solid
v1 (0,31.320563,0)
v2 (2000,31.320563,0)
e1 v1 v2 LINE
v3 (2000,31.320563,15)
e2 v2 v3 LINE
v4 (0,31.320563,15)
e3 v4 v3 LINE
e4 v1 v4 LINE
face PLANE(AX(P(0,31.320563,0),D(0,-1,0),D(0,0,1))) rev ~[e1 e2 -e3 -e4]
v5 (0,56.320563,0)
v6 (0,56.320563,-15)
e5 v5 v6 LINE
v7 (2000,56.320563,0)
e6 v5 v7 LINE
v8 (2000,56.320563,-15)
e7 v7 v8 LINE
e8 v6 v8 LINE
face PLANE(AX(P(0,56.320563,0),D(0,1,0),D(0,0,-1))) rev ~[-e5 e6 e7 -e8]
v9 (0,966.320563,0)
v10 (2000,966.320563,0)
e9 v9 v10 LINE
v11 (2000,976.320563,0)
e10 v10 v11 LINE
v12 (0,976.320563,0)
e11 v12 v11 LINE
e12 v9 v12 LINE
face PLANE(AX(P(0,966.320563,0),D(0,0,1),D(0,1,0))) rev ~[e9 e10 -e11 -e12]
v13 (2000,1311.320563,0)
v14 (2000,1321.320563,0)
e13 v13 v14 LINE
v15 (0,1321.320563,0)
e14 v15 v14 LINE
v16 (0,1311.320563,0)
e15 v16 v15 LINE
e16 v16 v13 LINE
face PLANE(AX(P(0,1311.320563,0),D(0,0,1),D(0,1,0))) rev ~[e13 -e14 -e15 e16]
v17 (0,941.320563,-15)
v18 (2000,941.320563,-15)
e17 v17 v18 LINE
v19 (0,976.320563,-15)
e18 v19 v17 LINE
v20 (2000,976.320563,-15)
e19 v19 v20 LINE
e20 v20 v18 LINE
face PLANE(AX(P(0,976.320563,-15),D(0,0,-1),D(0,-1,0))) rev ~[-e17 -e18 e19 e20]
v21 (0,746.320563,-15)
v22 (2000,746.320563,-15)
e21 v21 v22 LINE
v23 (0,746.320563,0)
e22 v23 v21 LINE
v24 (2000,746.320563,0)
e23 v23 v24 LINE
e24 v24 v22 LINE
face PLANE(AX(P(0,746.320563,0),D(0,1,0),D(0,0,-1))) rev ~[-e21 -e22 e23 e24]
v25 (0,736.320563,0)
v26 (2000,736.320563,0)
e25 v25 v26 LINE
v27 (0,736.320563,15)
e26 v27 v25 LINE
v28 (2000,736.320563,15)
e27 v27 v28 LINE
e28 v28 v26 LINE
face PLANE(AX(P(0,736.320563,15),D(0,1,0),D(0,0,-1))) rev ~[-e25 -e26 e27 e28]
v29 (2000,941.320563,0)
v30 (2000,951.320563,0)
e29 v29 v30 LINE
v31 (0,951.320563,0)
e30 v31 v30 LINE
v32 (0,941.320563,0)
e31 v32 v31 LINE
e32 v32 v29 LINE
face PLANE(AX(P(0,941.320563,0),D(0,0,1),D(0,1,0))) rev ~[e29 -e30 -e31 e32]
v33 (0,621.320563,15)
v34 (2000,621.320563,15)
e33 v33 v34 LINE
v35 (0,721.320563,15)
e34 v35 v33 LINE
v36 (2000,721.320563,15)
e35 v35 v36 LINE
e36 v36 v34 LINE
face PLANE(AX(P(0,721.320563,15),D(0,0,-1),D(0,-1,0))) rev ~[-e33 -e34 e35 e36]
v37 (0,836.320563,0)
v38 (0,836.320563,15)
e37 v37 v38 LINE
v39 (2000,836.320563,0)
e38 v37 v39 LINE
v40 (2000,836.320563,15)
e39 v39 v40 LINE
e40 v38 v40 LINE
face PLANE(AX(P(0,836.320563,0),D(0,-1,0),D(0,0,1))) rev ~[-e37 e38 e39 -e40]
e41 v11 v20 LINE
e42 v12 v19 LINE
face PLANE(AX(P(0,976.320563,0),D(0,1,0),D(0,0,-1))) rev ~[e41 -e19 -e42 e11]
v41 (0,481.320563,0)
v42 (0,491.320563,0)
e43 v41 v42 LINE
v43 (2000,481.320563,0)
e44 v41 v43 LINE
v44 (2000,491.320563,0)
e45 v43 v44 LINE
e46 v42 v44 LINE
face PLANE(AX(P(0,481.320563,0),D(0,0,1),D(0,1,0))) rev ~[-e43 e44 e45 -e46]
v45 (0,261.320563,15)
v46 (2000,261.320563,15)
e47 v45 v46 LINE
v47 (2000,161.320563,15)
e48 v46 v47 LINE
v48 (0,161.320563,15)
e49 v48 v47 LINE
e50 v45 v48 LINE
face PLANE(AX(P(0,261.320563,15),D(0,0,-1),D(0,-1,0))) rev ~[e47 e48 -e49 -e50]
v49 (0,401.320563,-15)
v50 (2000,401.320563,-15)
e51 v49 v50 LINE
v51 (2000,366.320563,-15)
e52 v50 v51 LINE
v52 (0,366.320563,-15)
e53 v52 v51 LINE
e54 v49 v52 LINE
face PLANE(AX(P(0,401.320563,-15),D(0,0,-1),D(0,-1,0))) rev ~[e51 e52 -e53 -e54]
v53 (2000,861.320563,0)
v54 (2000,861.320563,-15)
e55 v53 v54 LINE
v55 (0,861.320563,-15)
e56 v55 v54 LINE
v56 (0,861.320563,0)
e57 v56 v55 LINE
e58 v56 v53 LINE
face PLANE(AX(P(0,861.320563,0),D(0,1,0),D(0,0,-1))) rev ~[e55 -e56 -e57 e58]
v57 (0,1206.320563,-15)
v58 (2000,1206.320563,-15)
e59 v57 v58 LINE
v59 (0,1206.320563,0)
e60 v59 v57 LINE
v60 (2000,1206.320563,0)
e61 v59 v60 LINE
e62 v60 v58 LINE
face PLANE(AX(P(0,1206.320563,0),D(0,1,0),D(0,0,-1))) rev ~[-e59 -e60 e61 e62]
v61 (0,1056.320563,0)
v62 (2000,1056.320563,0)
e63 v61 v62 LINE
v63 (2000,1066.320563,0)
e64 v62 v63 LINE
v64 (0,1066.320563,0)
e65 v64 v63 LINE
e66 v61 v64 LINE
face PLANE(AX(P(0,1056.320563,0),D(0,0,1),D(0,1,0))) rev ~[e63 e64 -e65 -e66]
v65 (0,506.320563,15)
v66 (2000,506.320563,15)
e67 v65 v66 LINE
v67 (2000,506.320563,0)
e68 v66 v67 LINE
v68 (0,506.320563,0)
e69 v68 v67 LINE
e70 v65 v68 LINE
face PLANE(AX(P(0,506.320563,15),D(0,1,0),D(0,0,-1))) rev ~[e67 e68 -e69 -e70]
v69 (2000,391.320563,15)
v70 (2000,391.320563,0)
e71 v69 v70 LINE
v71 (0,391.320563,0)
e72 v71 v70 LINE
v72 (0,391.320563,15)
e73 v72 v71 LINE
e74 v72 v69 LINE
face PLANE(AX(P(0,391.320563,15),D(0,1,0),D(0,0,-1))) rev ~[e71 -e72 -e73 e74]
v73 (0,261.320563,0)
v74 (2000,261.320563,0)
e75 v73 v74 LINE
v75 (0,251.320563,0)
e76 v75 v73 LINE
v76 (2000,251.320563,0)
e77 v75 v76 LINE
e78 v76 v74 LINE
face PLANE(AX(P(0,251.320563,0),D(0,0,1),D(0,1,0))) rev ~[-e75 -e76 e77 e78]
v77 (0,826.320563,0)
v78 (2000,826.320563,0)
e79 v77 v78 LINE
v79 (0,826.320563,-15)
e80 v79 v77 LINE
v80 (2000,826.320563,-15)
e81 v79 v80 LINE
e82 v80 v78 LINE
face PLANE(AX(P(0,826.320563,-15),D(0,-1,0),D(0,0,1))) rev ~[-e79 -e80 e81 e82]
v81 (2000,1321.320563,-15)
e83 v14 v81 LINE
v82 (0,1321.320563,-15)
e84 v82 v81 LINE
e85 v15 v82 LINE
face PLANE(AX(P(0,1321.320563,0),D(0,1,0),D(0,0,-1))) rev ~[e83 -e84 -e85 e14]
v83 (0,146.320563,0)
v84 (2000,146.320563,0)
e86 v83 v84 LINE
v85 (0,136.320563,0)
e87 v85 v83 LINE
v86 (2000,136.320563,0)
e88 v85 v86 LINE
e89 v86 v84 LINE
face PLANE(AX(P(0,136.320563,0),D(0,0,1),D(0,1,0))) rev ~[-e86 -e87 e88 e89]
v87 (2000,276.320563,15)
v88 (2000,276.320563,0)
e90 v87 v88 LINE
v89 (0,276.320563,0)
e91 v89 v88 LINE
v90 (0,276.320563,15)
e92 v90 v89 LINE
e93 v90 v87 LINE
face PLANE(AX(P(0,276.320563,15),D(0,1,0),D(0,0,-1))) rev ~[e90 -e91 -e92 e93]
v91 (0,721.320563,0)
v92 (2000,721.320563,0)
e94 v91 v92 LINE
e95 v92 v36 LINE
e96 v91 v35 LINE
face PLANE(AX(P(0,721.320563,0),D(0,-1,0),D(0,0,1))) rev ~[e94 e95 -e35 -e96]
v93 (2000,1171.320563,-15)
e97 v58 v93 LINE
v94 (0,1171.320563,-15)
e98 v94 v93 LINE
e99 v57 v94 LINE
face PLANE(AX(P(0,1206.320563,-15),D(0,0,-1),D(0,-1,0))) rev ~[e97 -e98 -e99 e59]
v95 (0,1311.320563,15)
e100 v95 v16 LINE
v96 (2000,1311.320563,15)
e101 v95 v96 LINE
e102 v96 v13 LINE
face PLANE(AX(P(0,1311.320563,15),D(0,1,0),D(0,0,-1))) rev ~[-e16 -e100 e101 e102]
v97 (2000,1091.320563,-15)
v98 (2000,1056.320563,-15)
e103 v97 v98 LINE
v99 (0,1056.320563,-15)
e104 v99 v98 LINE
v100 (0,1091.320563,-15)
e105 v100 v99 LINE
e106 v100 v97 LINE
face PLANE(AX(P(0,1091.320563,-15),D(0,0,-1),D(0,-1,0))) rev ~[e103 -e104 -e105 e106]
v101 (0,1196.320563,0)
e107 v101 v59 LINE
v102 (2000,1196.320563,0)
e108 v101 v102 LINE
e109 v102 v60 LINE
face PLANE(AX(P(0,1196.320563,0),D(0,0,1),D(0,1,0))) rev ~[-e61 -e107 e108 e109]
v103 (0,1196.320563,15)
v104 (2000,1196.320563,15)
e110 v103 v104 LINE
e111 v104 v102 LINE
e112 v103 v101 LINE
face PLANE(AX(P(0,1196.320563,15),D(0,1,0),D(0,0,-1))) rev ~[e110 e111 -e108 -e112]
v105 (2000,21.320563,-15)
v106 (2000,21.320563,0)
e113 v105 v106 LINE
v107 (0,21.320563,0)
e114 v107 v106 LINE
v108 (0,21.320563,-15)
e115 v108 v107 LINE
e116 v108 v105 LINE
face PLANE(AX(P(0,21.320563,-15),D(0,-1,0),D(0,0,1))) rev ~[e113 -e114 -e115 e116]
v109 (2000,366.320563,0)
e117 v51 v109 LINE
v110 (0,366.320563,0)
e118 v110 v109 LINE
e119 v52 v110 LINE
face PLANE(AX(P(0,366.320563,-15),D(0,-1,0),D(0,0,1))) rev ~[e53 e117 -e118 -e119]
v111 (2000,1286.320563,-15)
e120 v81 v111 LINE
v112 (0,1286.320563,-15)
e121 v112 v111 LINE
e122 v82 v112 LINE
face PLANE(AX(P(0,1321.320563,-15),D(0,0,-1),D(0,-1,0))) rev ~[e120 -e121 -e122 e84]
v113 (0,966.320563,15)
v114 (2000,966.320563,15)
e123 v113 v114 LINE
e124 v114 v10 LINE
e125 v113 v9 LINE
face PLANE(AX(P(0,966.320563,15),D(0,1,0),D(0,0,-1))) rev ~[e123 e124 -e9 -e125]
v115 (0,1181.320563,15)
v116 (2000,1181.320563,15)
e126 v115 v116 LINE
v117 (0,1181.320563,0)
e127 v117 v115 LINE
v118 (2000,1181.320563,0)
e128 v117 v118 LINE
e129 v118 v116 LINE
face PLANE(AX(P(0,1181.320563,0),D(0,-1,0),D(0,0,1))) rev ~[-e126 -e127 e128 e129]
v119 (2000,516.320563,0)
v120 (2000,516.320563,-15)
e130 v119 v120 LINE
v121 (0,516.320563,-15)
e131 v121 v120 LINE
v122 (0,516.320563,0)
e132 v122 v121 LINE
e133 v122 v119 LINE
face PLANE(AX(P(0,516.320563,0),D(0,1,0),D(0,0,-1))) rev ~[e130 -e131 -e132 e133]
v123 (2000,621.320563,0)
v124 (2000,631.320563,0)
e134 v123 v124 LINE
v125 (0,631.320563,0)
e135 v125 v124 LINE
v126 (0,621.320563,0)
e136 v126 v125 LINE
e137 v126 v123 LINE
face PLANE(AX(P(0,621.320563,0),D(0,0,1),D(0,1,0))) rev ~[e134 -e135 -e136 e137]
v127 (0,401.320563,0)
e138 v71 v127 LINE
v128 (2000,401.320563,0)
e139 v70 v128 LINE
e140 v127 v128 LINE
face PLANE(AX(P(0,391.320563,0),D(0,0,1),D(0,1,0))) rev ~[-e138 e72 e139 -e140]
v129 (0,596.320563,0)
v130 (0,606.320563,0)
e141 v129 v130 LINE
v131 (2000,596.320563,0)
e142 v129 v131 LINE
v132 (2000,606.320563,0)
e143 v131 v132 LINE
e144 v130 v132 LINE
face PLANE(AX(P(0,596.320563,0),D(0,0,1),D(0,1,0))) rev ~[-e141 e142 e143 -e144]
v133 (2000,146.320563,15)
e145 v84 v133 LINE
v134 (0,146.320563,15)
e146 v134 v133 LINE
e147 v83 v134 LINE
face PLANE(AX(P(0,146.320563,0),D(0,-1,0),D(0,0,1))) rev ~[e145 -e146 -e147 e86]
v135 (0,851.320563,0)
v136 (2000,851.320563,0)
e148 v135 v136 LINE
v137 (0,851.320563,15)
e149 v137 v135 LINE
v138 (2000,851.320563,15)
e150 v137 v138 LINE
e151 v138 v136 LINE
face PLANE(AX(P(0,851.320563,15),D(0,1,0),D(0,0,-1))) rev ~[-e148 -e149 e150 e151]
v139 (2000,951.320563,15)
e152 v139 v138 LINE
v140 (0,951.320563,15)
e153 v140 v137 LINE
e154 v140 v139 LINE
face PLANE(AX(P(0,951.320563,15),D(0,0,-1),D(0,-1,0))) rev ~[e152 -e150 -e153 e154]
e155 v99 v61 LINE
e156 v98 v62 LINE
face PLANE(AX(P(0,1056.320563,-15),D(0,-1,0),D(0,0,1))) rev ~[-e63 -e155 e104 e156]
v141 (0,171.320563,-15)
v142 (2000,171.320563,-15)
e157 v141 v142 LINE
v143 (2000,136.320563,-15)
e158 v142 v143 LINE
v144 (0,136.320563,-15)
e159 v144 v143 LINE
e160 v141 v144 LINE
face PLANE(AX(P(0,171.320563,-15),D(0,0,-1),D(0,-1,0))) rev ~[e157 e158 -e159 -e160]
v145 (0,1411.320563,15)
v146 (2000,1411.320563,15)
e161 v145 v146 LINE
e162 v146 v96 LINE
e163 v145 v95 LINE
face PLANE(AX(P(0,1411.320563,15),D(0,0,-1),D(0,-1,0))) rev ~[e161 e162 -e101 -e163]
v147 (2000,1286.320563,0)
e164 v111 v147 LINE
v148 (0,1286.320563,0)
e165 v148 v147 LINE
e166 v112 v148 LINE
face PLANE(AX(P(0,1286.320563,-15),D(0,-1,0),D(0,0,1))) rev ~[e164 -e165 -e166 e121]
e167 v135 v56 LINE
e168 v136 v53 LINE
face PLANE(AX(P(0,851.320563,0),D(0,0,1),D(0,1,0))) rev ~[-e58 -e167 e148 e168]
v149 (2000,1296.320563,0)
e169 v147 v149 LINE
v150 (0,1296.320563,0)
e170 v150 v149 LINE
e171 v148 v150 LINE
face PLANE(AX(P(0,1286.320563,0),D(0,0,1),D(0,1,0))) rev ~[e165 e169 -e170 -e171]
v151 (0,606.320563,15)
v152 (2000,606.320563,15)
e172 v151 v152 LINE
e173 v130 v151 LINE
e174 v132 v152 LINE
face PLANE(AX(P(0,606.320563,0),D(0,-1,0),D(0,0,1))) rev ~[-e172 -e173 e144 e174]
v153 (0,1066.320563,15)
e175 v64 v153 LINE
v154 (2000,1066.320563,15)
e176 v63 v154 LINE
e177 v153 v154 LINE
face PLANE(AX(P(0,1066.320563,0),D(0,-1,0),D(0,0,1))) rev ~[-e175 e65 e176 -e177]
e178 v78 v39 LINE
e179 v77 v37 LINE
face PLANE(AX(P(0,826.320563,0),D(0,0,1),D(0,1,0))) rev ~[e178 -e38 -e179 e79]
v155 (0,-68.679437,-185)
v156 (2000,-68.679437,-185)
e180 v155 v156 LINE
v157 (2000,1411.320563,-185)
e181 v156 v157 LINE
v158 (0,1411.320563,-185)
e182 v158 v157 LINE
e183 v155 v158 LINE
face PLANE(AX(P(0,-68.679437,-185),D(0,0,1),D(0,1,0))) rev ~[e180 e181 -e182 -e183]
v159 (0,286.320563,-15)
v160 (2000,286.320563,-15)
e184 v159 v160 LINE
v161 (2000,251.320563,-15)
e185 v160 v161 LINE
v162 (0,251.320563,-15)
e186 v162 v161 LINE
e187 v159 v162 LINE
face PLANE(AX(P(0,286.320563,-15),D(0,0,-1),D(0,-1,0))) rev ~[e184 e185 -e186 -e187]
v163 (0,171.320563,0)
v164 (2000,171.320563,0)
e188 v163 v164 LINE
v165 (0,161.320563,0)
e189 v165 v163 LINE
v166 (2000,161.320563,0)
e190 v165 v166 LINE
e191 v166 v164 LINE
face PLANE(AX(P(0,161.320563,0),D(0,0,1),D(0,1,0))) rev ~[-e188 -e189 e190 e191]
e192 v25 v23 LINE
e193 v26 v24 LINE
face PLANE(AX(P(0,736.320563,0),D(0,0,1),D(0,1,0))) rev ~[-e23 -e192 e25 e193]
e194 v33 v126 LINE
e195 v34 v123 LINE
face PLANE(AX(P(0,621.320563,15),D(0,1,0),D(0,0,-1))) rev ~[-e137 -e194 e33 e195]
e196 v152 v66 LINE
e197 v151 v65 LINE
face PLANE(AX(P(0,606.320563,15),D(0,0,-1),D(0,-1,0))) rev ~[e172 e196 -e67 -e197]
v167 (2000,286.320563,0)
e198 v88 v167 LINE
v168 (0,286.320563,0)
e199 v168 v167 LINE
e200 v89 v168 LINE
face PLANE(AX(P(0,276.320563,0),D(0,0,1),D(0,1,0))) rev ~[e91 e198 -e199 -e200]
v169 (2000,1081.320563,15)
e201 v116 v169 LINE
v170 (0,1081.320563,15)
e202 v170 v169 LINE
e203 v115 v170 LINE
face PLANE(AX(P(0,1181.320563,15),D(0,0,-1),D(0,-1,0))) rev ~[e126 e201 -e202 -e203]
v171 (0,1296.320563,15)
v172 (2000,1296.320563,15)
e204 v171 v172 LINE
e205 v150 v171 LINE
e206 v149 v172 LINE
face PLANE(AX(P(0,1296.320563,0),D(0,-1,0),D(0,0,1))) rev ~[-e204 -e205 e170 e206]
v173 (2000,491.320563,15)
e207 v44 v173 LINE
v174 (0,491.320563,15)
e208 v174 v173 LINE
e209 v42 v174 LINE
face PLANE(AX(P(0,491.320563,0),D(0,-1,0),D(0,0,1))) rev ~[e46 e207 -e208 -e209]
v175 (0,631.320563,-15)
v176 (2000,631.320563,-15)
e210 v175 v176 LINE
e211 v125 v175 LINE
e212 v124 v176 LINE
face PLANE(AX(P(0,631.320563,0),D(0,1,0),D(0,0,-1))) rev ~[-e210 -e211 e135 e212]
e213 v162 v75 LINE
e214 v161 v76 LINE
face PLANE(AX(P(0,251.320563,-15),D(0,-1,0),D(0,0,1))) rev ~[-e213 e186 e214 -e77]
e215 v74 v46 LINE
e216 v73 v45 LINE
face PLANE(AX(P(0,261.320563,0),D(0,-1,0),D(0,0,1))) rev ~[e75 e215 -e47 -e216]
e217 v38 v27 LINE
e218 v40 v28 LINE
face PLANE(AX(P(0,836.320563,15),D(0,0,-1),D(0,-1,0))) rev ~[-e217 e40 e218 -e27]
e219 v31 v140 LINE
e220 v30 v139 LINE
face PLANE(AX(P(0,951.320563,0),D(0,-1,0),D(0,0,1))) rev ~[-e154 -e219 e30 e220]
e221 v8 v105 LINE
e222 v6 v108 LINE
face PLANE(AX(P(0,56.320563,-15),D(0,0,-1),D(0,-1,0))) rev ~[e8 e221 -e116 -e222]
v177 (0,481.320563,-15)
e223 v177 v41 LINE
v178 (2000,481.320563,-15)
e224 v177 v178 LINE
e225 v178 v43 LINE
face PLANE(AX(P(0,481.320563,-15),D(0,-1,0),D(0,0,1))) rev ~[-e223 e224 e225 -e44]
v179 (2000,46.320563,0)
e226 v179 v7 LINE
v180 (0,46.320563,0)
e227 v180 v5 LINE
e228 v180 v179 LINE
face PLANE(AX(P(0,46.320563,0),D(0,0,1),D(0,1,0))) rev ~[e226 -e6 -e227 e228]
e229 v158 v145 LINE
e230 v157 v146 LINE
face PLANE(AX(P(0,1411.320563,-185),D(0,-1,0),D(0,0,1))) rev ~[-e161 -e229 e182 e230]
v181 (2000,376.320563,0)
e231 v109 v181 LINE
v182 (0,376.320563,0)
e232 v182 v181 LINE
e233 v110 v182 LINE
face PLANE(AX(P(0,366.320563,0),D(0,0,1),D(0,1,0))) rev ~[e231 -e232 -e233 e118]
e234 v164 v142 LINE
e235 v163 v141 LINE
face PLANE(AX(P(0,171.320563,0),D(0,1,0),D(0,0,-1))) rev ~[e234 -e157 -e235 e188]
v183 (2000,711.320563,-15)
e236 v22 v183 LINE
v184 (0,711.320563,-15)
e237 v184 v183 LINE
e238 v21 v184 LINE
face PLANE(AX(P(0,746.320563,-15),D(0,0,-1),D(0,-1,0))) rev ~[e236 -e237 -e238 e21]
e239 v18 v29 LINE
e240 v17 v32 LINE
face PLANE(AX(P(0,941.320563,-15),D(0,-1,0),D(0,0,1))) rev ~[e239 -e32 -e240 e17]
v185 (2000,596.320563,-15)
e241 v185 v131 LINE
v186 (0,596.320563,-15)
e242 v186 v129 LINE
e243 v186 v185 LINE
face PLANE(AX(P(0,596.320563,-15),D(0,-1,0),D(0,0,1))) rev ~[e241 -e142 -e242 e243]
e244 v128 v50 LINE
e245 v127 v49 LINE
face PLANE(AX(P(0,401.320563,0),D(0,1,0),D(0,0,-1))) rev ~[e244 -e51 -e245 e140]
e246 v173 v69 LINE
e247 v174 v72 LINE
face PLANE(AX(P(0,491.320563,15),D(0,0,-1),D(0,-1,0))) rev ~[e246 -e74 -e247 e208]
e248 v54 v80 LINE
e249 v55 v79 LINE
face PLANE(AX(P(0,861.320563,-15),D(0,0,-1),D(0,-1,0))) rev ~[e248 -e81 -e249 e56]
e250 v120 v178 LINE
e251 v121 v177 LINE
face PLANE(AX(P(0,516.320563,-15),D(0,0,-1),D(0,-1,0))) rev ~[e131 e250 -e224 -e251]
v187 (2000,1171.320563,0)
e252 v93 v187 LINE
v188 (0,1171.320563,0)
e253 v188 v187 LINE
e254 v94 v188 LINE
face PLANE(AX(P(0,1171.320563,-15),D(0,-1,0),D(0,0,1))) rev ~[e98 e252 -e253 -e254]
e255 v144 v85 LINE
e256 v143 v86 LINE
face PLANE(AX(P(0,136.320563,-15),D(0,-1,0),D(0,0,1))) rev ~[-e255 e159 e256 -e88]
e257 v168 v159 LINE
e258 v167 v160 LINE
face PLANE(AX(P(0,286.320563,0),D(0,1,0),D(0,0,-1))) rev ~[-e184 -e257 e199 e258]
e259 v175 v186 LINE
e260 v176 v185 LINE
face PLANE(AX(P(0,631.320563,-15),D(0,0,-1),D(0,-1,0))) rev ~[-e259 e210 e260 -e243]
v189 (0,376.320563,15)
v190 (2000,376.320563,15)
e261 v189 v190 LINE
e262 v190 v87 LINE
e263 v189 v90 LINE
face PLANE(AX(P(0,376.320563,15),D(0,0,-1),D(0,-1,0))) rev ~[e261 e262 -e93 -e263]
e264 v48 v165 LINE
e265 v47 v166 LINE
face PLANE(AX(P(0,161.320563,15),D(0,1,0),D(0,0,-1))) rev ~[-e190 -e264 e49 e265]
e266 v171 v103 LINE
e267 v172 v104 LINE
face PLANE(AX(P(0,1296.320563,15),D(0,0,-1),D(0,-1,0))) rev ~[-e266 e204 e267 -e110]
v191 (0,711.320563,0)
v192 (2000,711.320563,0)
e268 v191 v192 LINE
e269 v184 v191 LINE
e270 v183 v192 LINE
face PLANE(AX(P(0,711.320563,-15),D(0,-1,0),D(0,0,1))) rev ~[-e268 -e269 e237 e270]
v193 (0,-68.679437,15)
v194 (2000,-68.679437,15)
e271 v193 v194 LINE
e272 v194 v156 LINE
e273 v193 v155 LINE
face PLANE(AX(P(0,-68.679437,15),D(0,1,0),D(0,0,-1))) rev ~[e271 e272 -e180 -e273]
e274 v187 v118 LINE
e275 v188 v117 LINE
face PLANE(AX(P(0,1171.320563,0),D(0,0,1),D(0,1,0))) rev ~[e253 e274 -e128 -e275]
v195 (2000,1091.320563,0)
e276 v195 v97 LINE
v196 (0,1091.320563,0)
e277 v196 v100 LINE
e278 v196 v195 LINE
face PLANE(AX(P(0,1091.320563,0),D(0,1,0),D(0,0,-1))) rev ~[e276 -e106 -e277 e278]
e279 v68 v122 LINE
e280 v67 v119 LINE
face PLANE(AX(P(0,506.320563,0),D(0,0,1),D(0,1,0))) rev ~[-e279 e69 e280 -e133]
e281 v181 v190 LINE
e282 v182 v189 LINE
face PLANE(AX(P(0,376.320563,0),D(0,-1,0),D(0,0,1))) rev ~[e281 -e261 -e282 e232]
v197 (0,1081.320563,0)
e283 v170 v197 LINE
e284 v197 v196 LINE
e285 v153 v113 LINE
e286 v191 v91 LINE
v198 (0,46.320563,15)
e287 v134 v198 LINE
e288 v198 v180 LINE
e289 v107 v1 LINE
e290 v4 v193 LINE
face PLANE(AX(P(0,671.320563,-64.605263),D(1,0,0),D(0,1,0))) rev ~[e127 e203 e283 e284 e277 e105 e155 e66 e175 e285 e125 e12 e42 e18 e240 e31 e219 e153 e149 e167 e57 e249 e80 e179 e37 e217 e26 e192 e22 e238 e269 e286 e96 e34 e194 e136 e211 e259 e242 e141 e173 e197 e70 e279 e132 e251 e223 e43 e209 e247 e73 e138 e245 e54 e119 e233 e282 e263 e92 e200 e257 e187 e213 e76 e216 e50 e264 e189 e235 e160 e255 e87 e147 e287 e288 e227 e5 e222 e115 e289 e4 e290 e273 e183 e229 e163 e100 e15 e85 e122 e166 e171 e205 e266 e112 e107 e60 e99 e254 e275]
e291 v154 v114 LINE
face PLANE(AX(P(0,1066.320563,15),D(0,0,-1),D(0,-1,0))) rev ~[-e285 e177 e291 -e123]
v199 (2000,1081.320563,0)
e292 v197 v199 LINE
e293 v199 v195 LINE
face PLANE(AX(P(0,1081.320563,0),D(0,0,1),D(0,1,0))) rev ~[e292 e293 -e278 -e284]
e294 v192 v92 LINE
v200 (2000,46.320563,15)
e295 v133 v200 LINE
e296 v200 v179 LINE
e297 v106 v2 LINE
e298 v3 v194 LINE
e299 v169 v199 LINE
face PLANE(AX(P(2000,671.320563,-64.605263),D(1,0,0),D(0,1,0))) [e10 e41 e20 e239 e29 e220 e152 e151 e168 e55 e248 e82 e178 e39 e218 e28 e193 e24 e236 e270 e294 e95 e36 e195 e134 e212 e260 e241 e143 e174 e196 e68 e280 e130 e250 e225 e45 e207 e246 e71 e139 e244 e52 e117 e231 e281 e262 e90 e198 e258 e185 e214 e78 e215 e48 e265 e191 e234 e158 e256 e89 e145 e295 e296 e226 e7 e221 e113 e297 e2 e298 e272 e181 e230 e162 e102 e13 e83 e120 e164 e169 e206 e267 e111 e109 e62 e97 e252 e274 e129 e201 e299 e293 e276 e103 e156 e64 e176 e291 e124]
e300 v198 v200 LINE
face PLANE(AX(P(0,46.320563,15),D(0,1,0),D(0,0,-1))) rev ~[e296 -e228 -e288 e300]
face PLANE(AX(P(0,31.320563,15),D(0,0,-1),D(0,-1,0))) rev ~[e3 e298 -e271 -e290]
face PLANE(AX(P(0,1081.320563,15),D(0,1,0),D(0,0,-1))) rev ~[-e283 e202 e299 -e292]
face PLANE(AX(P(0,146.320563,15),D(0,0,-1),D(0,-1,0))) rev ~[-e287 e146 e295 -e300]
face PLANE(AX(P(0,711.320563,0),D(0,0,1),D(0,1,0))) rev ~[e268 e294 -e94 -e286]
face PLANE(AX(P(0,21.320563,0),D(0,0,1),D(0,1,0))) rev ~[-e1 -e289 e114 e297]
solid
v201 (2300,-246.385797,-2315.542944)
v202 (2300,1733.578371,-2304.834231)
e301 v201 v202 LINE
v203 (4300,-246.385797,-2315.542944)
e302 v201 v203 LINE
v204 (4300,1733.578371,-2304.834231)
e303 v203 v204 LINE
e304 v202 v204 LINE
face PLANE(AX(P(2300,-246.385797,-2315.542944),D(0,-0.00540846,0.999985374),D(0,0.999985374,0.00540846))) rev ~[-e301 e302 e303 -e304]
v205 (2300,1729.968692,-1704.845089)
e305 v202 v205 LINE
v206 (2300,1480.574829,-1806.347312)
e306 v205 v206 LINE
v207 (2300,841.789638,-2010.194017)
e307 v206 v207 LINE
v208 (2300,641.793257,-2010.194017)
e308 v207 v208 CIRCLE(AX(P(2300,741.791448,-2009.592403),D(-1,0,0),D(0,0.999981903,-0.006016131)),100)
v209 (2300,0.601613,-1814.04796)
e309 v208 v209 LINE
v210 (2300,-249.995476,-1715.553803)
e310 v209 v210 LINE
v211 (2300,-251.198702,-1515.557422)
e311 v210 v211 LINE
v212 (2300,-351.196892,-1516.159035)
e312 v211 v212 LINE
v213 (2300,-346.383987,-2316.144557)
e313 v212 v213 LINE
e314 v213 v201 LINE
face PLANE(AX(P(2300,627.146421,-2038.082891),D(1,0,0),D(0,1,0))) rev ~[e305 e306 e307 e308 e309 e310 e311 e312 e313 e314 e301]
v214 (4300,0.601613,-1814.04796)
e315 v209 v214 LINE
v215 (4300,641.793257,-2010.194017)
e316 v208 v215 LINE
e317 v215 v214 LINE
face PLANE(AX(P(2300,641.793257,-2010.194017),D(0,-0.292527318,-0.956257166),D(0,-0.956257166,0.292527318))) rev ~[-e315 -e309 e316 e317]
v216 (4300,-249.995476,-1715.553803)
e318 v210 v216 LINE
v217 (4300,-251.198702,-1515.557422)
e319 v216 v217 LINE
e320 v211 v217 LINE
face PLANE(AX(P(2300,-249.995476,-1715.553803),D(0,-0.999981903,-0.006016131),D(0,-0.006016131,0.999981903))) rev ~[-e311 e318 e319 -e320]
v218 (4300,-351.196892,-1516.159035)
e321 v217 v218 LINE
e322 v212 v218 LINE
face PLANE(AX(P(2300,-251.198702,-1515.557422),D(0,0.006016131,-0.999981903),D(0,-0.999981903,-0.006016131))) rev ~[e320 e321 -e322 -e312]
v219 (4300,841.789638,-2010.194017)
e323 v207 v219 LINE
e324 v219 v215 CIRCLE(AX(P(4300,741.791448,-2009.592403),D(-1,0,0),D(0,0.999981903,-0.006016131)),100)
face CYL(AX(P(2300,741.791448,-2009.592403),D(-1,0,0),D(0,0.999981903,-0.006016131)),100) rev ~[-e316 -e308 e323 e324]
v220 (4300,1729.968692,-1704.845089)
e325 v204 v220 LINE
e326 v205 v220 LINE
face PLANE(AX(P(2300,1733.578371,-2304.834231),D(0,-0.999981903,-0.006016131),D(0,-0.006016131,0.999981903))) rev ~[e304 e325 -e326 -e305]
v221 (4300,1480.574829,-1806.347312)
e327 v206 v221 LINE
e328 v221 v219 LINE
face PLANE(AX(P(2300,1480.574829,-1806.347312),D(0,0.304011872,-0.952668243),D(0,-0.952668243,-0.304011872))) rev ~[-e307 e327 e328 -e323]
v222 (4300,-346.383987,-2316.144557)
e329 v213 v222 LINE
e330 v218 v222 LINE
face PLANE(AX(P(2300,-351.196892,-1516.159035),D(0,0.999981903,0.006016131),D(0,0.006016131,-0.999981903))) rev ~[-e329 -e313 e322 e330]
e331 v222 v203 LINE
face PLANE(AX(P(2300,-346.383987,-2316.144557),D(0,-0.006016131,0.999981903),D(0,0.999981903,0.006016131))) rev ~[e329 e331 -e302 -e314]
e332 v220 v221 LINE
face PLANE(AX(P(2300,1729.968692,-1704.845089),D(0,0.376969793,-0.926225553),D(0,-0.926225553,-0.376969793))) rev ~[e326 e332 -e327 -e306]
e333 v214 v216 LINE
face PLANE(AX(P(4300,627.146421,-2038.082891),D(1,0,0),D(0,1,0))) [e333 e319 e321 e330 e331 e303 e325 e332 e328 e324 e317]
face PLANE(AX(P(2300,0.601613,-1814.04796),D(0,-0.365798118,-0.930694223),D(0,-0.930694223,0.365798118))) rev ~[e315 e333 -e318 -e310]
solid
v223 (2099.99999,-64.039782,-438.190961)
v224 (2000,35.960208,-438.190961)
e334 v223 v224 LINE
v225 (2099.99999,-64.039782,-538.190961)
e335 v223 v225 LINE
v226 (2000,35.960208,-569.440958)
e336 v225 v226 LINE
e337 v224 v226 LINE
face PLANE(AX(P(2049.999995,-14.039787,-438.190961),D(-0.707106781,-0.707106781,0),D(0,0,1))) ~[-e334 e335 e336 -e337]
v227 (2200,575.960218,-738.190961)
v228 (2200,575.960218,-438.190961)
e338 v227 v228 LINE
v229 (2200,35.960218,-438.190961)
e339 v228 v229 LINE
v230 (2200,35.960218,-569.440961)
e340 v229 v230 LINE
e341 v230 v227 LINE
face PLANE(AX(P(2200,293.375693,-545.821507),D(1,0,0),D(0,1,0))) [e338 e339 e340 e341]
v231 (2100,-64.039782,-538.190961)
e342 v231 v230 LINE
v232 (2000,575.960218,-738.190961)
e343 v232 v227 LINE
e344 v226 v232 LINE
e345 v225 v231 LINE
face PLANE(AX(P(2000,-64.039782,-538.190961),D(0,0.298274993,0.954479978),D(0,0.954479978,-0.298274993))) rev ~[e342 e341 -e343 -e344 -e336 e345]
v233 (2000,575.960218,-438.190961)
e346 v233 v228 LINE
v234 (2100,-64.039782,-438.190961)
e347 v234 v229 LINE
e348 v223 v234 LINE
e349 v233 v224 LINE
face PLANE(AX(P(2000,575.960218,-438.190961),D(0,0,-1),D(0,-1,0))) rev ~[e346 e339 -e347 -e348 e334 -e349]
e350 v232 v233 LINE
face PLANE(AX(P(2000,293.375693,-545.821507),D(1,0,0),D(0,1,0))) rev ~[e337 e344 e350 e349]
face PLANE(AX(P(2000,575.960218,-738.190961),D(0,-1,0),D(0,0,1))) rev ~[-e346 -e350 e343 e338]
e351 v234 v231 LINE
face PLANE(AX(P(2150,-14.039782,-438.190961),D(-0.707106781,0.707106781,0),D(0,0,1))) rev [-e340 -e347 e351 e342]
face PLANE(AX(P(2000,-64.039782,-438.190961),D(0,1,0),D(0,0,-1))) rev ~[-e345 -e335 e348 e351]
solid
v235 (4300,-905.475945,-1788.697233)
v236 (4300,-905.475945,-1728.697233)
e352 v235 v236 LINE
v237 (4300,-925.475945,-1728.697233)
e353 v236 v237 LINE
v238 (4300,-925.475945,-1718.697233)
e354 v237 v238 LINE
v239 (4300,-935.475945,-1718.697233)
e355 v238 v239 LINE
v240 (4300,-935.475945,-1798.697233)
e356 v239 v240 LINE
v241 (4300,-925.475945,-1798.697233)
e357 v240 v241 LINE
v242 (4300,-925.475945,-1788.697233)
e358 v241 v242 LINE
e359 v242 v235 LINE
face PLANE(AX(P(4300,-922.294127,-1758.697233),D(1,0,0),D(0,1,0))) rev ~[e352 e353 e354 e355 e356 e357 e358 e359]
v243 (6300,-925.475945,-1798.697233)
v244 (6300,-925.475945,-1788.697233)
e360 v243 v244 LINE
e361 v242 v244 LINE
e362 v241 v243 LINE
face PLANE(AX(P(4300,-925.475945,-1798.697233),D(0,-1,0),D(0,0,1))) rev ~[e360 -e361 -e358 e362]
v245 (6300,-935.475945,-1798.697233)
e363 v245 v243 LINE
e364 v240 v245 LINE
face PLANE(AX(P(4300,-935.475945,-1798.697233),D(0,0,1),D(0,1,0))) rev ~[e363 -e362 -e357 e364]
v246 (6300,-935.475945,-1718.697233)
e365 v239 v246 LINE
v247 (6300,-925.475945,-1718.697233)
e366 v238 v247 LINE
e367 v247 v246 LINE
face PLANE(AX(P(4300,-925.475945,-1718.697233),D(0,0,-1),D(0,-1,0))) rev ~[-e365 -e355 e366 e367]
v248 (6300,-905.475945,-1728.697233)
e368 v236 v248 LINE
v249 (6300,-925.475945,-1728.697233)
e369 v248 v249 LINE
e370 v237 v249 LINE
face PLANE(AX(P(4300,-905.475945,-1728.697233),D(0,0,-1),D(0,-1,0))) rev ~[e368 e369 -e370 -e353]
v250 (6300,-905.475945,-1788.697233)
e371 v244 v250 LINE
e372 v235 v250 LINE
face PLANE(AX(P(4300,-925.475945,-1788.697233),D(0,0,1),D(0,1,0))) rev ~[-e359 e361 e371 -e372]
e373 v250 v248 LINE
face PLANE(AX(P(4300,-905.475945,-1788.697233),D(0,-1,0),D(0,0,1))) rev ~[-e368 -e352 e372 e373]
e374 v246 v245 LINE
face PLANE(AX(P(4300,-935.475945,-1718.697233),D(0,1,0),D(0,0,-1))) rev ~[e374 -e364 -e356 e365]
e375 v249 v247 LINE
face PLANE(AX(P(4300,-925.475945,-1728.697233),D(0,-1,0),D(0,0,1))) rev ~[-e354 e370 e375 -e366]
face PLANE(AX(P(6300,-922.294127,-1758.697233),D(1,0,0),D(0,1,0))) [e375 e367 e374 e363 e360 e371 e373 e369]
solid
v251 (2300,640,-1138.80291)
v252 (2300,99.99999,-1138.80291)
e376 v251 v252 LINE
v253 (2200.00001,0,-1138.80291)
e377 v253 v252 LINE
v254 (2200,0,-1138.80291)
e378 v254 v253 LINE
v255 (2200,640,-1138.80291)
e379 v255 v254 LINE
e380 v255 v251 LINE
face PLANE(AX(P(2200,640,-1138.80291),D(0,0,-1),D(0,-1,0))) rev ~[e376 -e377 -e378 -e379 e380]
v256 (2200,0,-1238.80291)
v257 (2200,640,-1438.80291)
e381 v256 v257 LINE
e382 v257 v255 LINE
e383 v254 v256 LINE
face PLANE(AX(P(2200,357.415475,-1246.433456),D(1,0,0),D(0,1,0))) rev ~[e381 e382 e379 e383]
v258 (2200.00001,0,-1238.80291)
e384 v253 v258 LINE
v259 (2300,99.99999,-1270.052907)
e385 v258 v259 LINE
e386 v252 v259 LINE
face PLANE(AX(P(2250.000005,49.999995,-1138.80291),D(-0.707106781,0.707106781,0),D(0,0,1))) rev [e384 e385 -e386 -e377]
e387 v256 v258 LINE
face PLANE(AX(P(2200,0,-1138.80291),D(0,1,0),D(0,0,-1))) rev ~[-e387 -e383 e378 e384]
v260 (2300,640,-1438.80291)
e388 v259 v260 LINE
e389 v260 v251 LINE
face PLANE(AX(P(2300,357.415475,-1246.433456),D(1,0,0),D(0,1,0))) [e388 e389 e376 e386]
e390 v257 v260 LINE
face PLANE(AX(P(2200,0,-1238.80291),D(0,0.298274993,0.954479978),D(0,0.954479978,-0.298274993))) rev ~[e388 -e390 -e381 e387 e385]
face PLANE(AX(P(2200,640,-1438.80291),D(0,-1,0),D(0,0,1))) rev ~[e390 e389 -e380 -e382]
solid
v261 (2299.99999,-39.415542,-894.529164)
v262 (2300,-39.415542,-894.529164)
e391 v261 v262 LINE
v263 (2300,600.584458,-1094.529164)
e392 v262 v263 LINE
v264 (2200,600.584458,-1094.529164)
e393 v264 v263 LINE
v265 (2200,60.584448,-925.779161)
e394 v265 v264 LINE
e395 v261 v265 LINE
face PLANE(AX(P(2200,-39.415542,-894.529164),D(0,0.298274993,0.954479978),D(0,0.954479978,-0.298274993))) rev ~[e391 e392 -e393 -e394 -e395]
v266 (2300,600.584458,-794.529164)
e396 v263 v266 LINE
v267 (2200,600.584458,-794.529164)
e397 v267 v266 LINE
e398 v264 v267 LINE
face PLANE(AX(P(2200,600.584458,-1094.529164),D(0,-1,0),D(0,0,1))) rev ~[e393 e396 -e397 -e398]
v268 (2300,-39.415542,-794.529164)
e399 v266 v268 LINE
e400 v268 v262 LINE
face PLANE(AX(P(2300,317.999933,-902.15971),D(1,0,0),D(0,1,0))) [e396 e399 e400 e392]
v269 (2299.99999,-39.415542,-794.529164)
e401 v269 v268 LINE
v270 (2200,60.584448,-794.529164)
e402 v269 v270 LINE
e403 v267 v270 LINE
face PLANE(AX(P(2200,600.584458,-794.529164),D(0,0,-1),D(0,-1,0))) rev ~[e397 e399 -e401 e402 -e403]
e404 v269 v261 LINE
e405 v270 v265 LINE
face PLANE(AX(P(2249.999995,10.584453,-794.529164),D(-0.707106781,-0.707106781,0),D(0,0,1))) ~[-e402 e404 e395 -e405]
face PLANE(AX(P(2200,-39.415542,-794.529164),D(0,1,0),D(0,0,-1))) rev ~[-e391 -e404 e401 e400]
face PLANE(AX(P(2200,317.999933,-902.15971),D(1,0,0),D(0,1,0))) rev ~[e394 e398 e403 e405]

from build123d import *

# Parameters (mm, degrees)
F1_DEPTH  = 2000
F3_DEPTH  = 200
F4_SIZE   = 100
F5_SIZE   = 99.99999
F8_DEPTH  = 100
F9_DEPTH  = 100
F10_SIZE  = 99.99999
F11_SIZE  = 99.99999
F13_DEPTH = 2000
F15_DEPTH = 2000


# Not quite as in the source:
# - a fillet or chamfer is up to 0.001 mm smaller than in the source, because OpenCascade refuses the exact size


with BuildPart() as f1:
    # F0 (on Right) → F1 (new body)
    with BuildSketch(Plane.YZ):
        Polygon((31.3205629587, 15), (-68.6794370413, 15), (-68.6794370413, -185), (1411.3205629587, -185), (1411.3205629587, 15), (1311.3205629587, 15), (1311.3205629587, 0), (1321.3205629587, 0), (1321.3205629587, -15), (1286.3205629587, -15), (1286.3205629587, 0), (1296.3205629587, 0), (1296.3205629587, 15), (1196.3205629587, 15), (1196.3205629587, 0), (1206.3205629587, 0), (1206.3205629587, -15), (1171.3205629587, -15), (1171.3205629587, 0), (1181.3205629587, 0), (1181.3205629587, 15), (1081.3205629587, 15), (1081.3205629587, 0), (1091.3205629587, 0), (1091.3205629587, -15), (1056.3205629587, -15), (1056.3205629587, 0), (1066.3205629587, 0), (1066.3205629587, 15), (966.3205629587, 15), (966.3205629587, 0), (976.3205629587, 0), (976.3205629587, -15), (941.3205629587, -15), (941.3205629587, 0), (951.3205629587, 0), (951.3205629587, 15), (851.3205629587, 15), (851.3205629587, 0), (861.3205629587, 0), (861.3205629587, -15), (826.3205629587, -15), (826.3205629587, 0), (836.3205629587, 0), (836.3205629587, 15), (736.3205629587, 15), (736.3205629587, 0), (746.3205629587, 0), (746.3205629587, -15), (711.3205629587, -15), (711.3205629587, 0), (721.3205629587, 0), (721.3205629587, 15), (621.3205629587, 15), (621.3205629587, 0), (631.3205629587, 0), (631.3205629587, -15), (596.3205629587, -15), (596.3205629587, 0), (606.3205629587, 0), (606.3205629587, 15), (506.3205629587, 15), (506.3205629587, 0), (516.3205629587, 0), (516.3205629587, -15), (481.3205629587, -15), (481.3205629587, 0), (491.3205629587, 0), (491.3205629587, 15), (391.3205629587, 15), (391.3205629587, 0), (401.3205629587, 0), (401.3205629587, -15), (366.3205629587, -15), (366.3205629587, 0), (376.3205629587, 0), (376.3205629587, 15), (276.3205629587, 15), (276.3205629587, 0), (286.3205629587, 0), (286.3205629587, -15), (251.3205629587, -15), (251.3205629587, 0), (261.3205629587, 0), (261.3205629587, 15), (161.3205629587, 15), (161.3205629587, 0), (171.3205629587, 0), (171.3205629587, -15), (136.3205629587, -15), (136.3205629587, 0), (146.3205629587, 0), (146.3205629587, 15), (46.3205629587, 15), (46.3205629587, 0), (56.3205629587, 0), (56.3205629587, -15), (21.3205629587, -15), (21.3205629587, 0), (31.3205629587, 0), align=None)
    extrude(amount=F1_DEPTH)


with BuildPart() as f3:
    # F2 (on face) → F3 (new body)
    with BuildSketch(Plane.YZ.offset(2000)):
        Polygon((575.9602183104, -438.1909608841), (-64.0397816896, -438.1909608841), (-64.0397816896, -538.1909608841), (575.9602183104, -738.1909608841), align=None)
    extrude(amount=F3_DEPTH)

    # F4
    f4_edges = [f3.edges().sort_by_distance(p)[0] for p in [
        (2200, -64.039782, -488.190961),
    ]]
    chamfer(f4_edges, length=F4_SIZE)

    # F5 (size 100 in the source; OpenCascade refuses exactly that, so slightly less here)
    f5_edges = [f3.edges().sort_by_distance(p)[0] for p in [
        (2000, -64.039782, -488.190961),
    ]]
    chamfer(f5_edges, length=F5_SIZE)


with BuildPart() as f8:
    # F6 (on face) → F8 (new body)
    with BuildSketch(Plane.YZ.offset(2200)):
        Polygon((600.5844579637, -1094.5291638374), (600.5844579637, -794.5291638374), (-39.4155420363, -794.5291638374), (-39.4155420363, -894.5291638374), align=None)
    extrude(amount=F8_DEPTH)

    # F10 (size 100 in the source; OpenCascade refuses exactly that, so slightly less here)
    f10_edges = [f8.edges().sort_by_distance(p)[0] for p in [
        (2200, -39.415542, -844.529164),
    ]]
    chamfer(f10_edges, length=F10_SIZE)


with BuildPart() as f9:
    # F7 (on face) → F9 (new body)
    with BuildSketch(Plane.YZ.offset(2200)):
        Polygon((640, -1438.8029098511), (640, -1138.8029098511), (0, -1138.8029098511), (0, -1238.8029098511), align=None)
    extrude(amount=F9_DEPTH)

    # F11 (size 100 in the source; OpenCascade refuses exactly that, so slightly less here)
    f11_edges = [f9.edges().sort_by_distance(p)[0] for p in [
        (2300, 0, -1188.80291),
    ]]
    chamfer(f11_edges, length=F11_SIZE)


with BuildPart() as f13:
    # F12 (on face) → F13 (new body)
    with BuildSketch(Plane.YZ.offset(2300)):
        with BuildLine():
            ThreePointArc((841.7896378459, -2010.1940166026), (741.7914475541, -2109.592403471), (641.7932572623, -2010.1940166026))
            Line((641.7932572623, -2010.1940166026), (0.6016131315, -1814.0479600607))
            Line((0.6016131315, -1814.0479600607), (-249.9954757296, -1715.5538025978))
            Line((-249.9954757296, -1715.5538025978), (-251.1987019926, -1515.5574220141))
            Line((-251.1987019926, -1515.5574220141), (-351.1968922845, -1516.1590351456))
            Line((-351.1968922845, -1516.1590351456), (-346.3839872322, -2316.1445574802))
            Line((-346.3839872322, -2316.1445574802), (-246.3857969404, -2315.5429443487))
            Line((-246.3857969404, -2315.5429443487), (1733.5783708378, -2304.8342306074))
            Line((1733.5783708378, -2304.8342306074), (1729.9686920486, -1704.8450888564))
            Line((1729.9686920486, -1704.8450888564), (1480.5748294505, -1806.3473119771))
            Line((1480.5748294505, -1806.3473119771), (841.7896378459, -2010.1940166026))
        make_face()
    extrude(amount=F13_DEPTH)


with BuildPart() as f15:
    # F14 (on face) → F15 (new body)
    with BuildSketch(Plane.YZ.offset(4300)):
        Polygon((-925.4759454727, -1718.6972332001), (-935.4759454727, -1718.6972332001), (-935.4759454727, -1798.6972332001), (-925.4759454727, -1798.6972332001), (-925.4759454727, -1788.6972332001), (-905.4759454727, -1788.6972332001), (-905.4759454727, -1728.6972332001), (-925.4759454727, -1728.6972332001), align=None)
    extrude(amount=F15_DEPTH)


solid = Compound([f1.part, f3.part, f8.part, f9.part, f13.part, f15.part])
